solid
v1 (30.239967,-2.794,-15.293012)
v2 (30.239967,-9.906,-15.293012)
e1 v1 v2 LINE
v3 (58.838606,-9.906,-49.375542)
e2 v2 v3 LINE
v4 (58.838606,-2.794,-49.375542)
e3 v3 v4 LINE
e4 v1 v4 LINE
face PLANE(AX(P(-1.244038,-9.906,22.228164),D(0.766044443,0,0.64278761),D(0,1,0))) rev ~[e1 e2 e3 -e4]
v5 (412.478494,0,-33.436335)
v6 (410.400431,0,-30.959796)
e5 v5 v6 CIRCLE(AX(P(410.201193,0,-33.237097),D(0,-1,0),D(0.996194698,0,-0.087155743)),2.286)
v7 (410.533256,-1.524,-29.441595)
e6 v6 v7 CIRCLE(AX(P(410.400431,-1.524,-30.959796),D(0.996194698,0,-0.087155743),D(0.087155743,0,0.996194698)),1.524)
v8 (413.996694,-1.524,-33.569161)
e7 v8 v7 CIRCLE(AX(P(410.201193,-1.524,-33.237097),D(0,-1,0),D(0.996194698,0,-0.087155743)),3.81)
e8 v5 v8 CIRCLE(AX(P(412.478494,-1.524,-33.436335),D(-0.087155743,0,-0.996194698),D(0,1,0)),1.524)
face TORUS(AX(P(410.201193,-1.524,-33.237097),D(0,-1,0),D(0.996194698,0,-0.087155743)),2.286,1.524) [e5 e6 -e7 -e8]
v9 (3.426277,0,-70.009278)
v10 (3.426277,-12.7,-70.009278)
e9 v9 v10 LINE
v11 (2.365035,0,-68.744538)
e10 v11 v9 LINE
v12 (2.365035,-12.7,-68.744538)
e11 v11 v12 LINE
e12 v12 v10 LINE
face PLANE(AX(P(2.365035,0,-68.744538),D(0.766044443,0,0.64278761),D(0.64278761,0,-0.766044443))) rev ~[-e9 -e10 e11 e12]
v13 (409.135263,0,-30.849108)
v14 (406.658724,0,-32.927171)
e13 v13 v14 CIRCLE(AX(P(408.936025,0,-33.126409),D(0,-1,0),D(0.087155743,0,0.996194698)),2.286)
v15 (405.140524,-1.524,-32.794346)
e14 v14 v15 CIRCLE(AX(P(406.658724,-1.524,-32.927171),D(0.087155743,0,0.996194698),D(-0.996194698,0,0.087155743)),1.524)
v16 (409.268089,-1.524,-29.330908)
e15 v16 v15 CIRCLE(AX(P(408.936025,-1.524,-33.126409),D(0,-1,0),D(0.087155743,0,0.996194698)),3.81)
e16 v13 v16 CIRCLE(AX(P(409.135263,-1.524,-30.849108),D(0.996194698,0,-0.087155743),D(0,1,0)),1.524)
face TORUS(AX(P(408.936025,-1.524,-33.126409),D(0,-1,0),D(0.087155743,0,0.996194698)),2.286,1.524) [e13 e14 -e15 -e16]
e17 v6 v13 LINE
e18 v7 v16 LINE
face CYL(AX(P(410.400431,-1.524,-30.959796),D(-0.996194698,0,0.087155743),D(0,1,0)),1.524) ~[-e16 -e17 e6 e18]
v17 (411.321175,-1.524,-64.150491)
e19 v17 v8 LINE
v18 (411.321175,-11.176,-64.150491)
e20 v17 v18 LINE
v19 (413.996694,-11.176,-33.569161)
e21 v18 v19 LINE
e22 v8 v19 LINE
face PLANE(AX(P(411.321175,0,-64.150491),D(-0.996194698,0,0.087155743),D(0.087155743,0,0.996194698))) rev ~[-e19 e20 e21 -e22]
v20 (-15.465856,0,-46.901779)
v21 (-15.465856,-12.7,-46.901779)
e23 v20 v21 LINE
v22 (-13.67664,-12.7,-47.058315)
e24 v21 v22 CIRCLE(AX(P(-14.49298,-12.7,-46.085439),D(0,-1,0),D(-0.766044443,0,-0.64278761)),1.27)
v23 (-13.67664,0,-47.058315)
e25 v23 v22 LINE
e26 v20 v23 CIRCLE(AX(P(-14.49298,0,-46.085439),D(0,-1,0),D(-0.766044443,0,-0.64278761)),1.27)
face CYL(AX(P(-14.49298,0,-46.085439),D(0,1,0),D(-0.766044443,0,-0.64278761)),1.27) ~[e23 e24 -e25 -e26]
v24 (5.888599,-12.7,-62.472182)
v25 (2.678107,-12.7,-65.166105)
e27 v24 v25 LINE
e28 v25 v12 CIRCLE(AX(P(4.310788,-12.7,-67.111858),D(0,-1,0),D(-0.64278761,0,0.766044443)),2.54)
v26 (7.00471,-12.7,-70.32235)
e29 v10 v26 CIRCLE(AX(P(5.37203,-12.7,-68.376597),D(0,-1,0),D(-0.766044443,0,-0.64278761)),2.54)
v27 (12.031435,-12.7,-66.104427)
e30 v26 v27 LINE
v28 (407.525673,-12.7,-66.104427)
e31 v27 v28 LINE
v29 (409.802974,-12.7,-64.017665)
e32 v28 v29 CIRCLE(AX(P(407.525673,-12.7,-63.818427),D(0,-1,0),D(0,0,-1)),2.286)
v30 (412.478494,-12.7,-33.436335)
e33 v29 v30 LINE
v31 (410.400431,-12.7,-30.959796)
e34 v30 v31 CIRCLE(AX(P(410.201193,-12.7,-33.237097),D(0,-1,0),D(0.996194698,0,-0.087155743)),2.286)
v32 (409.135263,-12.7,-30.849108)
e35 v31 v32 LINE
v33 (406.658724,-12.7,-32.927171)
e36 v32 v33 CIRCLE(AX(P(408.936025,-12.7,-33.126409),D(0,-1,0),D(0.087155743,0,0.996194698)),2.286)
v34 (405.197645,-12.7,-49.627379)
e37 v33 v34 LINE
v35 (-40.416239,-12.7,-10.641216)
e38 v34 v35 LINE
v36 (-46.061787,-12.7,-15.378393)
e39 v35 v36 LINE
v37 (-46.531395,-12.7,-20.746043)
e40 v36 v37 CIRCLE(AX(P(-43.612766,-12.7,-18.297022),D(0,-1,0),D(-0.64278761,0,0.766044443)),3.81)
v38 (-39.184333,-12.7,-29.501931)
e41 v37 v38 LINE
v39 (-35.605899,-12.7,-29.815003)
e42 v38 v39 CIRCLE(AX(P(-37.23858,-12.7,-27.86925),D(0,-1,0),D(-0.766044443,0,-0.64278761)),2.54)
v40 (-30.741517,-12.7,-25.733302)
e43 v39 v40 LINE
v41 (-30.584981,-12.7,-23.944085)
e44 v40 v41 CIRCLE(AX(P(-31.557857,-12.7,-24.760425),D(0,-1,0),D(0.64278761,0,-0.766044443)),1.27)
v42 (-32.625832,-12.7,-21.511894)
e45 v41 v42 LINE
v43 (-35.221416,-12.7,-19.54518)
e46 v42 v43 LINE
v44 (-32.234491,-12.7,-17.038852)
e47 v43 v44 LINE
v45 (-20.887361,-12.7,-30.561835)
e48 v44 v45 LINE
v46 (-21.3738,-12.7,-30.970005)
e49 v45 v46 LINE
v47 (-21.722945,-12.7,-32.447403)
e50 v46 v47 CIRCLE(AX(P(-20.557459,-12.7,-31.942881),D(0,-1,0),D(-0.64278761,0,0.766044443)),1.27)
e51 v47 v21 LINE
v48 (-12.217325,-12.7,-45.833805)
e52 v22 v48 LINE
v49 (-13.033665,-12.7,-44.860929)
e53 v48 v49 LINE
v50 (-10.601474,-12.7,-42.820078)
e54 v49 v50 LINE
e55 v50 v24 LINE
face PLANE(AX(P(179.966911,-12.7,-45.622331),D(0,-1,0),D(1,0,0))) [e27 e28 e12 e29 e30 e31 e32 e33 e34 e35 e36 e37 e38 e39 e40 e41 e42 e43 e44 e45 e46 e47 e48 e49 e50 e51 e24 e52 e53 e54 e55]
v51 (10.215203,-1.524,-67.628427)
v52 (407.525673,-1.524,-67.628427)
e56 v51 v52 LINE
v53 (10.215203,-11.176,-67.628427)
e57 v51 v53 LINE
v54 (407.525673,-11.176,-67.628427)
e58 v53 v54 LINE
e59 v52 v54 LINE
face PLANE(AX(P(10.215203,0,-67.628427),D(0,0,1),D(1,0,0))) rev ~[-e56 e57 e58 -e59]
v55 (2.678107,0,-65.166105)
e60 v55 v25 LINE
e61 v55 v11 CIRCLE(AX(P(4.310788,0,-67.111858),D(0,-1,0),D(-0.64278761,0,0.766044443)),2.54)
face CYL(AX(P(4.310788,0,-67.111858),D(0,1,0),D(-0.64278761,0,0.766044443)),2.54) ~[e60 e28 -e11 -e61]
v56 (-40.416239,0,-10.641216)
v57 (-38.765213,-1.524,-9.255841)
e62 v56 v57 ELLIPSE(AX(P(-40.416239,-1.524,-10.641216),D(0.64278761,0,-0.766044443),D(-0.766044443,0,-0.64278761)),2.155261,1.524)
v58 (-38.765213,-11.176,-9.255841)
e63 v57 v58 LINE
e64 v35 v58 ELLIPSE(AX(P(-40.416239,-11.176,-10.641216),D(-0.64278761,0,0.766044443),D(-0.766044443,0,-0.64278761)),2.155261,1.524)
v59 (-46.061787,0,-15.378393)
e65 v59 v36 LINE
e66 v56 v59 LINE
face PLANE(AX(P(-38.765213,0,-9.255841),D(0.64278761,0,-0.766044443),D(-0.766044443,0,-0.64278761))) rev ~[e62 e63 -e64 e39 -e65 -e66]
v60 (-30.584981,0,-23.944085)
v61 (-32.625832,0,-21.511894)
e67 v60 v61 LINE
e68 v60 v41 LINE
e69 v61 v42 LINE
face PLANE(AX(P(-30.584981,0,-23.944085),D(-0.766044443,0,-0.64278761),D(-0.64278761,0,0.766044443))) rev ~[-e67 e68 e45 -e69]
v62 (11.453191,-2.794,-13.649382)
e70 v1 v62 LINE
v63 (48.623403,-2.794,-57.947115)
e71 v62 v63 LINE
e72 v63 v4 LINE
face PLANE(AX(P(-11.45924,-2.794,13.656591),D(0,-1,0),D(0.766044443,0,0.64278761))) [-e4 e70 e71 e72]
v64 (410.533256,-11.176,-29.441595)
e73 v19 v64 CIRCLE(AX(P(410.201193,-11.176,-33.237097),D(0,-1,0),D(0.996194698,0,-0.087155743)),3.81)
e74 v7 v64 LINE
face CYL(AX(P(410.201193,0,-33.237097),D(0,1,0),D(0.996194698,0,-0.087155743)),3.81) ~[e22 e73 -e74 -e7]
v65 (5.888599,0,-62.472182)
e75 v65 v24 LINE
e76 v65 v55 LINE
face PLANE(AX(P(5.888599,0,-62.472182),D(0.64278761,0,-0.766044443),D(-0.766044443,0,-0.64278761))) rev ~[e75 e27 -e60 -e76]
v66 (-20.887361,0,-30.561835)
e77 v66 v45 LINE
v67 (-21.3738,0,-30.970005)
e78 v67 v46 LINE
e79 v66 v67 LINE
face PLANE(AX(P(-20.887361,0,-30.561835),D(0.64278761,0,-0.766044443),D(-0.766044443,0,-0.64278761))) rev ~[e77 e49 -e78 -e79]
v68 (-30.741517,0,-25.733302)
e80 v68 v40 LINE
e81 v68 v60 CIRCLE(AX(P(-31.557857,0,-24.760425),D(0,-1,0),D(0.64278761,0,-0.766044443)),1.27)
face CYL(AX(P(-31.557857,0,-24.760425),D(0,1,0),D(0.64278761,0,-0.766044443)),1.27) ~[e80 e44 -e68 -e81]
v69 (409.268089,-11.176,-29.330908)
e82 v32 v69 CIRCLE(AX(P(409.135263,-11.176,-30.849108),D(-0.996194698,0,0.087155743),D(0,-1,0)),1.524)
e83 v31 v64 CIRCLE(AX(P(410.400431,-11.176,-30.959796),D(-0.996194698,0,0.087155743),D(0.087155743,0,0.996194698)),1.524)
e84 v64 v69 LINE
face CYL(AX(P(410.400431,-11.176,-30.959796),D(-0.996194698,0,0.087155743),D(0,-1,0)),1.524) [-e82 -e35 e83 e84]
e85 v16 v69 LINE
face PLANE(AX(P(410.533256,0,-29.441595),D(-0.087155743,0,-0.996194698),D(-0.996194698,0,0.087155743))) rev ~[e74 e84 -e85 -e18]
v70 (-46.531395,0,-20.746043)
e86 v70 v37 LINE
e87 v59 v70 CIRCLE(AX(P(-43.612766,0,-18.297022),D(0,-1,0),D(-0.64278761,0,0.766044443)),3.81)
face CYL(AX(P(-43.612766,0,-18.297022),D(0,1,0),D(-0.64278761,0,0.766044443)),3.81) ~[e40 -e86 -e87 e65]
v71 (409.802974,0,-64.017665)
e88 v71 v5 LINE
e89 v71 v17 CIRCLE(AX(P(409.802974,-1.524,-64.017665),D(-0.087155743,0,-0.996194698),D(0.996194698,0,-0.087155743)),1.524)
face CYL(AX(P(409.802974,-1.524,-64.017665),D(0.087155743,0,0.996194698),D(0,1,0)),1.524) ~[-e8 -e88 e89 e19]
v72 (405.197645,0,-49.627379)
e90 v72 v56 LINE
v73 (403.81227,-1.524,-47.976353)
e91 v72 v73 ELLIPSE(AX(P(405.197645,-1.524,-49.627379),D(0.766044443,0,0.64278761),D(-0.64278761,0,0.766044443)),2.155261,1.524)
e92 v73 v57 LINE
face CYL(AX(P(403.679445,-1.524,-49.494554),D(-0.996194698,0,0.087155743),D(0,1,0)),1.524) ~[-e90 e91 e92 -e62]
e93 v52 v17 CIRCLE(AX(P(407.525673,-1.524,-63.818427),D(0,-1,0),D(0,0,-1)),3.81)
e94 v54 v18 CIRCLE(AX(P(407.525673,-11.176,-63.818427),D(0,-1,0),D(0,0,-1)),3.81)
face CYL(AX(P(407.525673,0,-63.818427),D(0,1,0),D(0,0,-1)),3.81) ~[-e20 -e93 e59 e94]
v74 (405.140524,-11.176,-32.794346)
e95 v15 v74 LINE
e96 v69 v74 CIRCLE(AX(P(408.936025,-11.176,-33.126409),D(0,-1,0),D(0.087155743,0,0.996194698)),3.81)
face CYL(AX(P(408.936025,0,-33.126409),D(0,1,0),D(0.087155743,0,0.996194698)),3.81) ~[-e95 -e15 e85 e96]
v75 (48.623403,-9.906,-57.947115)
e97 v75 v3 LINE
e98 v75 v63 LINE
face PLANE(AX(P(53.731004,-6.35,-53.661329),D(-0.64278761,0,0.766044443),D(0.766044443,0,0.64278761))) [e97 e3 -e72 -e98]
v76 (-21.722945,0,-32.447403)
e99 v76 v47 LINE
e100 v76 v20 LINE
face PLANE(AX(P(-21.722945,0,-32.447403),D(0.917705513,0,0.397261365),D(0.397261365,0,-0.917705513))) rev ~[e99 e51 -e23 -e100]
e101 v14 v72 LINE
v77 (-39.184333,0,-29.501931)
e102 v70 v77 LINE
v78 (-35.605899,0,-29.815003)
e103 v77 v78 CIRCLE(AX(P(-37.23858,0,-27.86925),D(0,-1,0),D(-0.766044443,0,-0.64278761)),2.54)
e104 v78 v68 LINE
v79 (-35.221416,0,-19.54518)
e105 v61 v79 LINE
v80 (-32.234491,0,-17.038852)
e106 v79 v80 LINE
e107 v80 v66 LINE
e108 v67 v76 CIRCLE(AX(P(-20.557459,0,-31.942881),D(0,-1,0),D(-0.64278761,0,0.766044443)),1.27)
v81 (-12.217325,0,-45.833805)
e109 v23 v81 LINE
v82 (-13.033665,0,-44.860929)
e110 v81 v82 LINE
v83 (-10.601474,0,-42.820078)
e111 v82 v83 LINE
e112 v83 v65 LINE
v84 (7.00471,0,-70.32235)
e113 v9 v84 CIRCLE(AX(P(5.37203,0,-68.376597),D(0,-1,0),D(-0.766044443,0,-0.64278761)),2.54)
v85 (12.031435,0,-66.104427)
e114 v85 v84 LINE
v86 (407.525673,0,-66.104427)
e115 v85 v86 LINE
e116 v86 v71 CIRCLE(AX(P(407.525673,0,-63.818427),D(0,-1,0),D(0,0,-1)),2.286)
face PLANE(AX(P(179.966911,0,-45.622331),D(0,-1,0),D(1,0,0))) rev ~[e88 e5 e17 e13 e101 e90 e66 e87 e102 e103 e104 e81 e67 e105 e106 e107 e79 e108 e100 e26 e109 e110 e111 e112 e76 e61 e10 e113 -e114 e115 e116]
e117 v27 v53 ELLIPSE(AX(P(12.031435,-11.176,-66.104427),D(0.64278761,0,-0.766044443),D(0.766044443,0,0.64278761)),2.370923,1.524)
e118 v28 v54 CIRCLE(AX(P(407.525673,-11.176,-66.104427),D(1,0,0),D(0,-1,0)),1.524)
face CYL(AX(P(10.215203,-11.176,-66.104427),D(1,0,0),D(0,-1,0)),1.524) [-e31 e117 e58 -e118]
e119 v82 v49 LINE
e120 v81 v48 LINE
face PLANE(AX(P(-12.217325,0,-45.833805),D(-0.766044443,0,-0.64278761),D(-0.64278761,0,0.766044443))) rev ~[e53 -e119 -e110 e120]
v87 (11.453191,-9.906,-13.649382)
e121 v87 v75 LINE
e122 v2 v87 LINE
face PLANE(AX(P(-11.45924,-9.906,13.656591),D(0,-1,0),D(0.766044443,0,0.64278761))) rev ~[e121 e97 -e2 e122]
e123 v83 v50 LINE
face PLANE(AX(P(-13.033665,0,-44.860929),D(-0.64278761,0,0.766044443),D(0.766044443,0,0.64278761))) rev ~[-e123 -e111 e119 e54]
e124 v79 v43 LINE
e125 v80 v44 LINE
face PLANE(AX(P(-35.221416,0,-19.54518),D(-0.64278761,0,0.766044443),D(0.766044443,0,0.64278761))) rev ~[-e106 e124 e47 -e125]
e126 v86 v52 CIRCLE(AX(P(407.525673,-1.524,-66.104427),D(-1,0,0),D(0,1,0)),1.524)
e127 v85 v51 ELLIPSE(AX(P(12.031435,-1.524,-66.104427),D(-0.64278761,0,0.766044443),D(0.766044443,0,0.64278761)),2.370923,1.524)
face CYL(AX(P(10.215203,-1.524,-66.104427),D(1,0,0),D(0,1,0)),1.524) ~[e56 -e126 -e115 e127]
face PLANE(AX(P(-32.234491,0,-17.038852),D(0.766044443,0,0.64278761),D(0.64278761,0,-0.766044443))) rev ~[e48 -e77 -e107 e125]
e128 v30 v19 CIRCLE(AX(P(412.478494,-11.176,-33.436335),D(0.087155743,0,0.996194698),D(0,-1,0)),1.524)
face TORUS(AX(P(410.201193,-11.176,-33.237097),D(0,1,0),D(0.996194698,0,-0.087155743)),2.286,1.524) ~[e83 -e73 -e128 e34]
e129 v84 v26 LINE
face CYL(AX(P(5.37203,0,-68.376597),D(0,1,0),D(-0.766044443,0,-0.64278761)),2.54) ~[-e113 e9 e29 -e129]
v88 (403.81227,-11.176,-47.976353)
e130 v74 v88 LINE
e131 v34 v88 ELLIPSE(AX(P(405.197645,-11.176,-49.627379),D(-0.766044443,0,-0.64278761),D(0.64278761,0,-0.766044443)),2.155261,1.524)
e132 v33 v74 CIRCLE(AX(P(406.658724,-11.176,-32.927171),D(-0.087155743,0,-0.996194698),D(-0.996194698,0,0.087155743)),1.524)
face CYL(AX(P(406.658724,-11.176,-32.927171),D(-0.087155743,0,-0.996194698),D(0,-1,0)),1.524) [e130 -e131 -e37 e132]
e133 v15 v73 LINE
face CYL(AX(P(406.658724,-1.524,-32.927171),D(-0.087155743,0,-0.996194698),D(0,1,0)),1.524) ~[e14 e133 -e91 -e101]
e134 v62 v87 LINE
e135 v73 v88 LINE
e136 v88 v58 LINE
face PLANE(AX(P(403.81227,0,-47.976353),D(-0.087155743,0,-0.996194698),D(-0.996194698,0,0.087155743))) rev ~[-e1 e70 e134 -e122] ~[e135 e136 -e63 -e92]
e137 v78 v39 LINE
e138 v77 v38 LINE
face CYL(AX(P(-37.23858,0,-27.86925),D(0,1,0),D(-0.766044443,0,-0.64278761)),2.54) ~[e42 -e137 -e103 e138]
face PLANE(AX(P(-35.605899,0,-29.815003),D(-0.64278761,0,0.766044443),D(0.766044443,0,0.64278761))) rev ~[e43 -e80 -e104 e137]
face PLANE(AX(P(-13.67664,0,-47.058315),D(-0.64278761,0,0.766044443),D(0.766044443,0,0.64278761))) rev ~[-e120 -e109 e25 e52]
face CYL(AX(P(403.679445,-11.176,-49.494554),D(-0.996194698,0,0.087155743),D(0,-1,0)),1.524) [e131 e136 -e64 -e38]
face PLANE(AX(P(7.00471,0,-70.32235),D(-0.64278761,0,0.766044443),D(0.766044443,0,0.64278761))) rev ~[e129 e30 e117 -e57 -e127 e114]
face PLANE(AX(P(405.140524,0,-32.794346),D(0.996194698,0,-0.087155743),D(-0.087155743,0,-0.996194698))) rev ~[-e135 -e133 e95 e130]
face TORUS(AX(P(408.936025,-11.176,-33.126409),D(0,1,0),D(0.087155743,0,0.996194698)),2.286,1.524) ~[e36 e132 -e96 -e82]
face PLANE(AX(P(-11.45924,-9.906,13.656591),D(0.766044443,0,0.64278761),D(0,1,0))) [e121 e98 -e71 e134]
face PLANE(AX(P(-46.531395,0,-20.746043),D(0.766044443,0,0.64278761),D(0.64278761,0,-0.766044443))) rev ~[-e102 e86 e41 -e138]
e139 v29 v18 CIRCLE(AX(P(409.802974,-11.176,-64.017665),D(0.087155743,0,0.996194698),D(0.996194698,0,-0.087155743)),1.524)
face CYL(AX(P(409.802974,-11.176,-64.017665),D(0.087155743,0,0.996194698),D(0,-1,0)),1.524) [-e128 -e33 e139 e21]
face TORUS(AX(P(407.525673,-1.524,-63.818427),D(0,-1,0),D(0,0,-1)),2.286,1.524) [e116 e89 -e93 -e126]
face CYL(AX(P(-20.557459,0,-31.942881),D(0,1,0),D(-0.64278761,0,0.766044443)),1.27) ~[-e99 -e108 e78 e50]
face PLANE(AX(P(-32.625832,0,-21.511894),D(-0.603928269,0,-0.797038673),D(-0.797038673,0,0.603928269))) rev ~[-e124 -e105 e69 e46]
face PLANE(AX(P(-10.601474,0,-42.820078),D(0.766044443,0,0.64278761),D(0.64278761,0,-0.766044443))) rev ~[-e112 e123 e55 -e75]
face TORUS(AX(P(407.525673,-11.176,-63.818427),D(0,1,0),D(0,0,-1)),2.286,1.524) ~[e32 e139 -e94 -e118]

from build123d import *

# Parameters (mm, degrees)
F1_DEPTH = 12.7
F2_W     = 13.335
F2_H     = 7.112
F3_DEPTH = 93.472
F5_R     = 1.524


# Not quite as in the source:
# - two fillets or chamfers of one size are made in one step


with BuildPart() as f1:
    # F0 (on Front) → F1 (new body)
    with BuildSketch(Plane.XZ):
        with BuildLine():
            ThreePointArc((-46.0617865298, -15.3783926414), (-47.4082675367, -17.9649585898), (-46.5313950652, -20.7460427626))
            Line((-46.5313950652, -20.7460427626), (-39.1843326865, -29.5019307475))
            ThreePointArc((-39.1843326865, -29.5019307475), (-37.4599553875, -30.399584752), (-35.6058992724, -29.8150031044))
            Line((-35.6058992724, -29.8150031044), (-30.7415170586, -25.7333017829))
            ThreePointArc((-30.7415170586, -25.7333017829), (-30.2926900563, -24.8711131334), (-30.5849808801, -23.9440850758))
            Line((-30.5849808801, -23.9440850758), (-32.6258315409, -21.5118939689))
            Line((-32.6258315409, -21.5118939689), (-35.2214163384, -19.5451800716))
            Line((-35.2214163384, -19.5451800716), (-32.2344910947, -17.0388522013))
            Line((-32.2344910947, -17.0388522013), (-20.8873614209, -30.5618347556))
            Line((-20.8873614209, -30.5618347556), (-21.3737996423, -30.9700048878))
            ThreePointArc((-21.3737996423, -30.9700048878), (-21.7934146066, -31.6507945747), (-21.722945379, -32.4474032641))
            Line((-21.722945379, -32.4474032641), (-15.4658563045, -46.9017792559))
            ThreePointArc((-15.4658563045, -46.9017792559), (-14.603667655, -47.3506062582), (-13.6766395974, -47.0583154344))
            Line((-13.6766395974, -47.0583154344), (-12.2173249333, -45.8338050379))
            Line((-12.2173249333, -45.8338050379), (-13.0336651976, -44.8609285952))
            Line((-13.0336651976, -44.8609285952), (-10.6014740907, -42.8200779344))
            Line((-10.6014740907, -42.8200779344), (5.8885992482, -62.4721820782))
            Line((5.8885992482, -62.4721820782), (2.6781069871, -65.1661049504))
            ThreePointArc((2.6781069871, -65.1661049504), (1.7804529825, -66.8904822493), (2.3650346302, -68.7445383645))
            Line((2.3650346302, -68.7445383645), (3.4262769738, -70.0092777401))
            ThreePointArc((3.4262769738, -70.0092777401), (5.1506542727, -70.9069317447), (7.0047103879, -70.322350097))
            Line((7.0047103879, -70.322350097), (10.215202649, -67.6284272248))
            Line((10.215202649, -67.6284272248), (407.5256729651, -67.6284272248))
            ThreePointArc((407.5256729651, -67.6284272248), (410.0996716561, -66.6274538781), (411.3211747648, -64.1504906047))
            Line((411.3211747648, -64.1504906047), (413.9966944617, -33.5691605326))
            ThreePointArc((413.9966944617, -33.5691605326), (413.1198219902, -30.7880763598), (410.5332560418, -29.441595353))
            Line((410.5332560418, -29.441595353), (409.2680887752, -29.3309075597))
            ThreePointArc((409.2680887752, -29.3309075597), (406.4870046025, -30.2077800311), (405.1405235956, -32.7943459795))
            Line((405.1405235956, -32.7943459795), (403.8122700762, -47.9763531785))
            Line((403.8122700762, -47.9763531785), (-38.7652132091, -9.2558406592))
            Line((-38.7652132091, -9.2558406592), (-46.0617865298, -15.3783926414))
        make_face()
    extrude(amount=F1_DEPTH)

    # F2 (on face) → F3 (cut)
    with BuildSketch(Plane(origin=(-11.4592404683, 0, 13.6565909966), x_dir=(0.7660444431, 0, 0.6427876097), z_dir=(-0.6427876097, 0, 0.7660444431))):
        with Locations((6.6675, -6.35)):
            Rectangle(F2_W, F2_H)
    extrude(amount=-F3_DEPTH, mode=Mode.SUBTRACT)

    # F5
    f5_edges = [f1.edges().sort_by_distance(p)[0] for p in [
        (182.523528, 0, -28.616097),
        (404.476397, 0, -40.38535),
        (208.870438, 0, -67.628427),
        (409.900672, 0, -29.386251),
        (409.900672, -12.7, -29.386251),
        (413.119822, 0, -30.788076),
        (413.119822, -12.7, -30.788076),
        (406.487005, 0, -30.20778),
        (406.487005, -12.7, -30.20778),
        (410.099672, 0, -66.627454),
        (412.658935, 0, -48.859826),
        (404.476397, -12.7, -40.38535),
        (182.523528, -12.7, -28.616097),
        (208.870438, -12.7, -67.628427),
        (410.099672, -12.7, -66.627454),
        (412.658935, -12.7, -48.859826),
    ]]
    fillet(f5_edges, radius=F5_R)


solid = f1.part
